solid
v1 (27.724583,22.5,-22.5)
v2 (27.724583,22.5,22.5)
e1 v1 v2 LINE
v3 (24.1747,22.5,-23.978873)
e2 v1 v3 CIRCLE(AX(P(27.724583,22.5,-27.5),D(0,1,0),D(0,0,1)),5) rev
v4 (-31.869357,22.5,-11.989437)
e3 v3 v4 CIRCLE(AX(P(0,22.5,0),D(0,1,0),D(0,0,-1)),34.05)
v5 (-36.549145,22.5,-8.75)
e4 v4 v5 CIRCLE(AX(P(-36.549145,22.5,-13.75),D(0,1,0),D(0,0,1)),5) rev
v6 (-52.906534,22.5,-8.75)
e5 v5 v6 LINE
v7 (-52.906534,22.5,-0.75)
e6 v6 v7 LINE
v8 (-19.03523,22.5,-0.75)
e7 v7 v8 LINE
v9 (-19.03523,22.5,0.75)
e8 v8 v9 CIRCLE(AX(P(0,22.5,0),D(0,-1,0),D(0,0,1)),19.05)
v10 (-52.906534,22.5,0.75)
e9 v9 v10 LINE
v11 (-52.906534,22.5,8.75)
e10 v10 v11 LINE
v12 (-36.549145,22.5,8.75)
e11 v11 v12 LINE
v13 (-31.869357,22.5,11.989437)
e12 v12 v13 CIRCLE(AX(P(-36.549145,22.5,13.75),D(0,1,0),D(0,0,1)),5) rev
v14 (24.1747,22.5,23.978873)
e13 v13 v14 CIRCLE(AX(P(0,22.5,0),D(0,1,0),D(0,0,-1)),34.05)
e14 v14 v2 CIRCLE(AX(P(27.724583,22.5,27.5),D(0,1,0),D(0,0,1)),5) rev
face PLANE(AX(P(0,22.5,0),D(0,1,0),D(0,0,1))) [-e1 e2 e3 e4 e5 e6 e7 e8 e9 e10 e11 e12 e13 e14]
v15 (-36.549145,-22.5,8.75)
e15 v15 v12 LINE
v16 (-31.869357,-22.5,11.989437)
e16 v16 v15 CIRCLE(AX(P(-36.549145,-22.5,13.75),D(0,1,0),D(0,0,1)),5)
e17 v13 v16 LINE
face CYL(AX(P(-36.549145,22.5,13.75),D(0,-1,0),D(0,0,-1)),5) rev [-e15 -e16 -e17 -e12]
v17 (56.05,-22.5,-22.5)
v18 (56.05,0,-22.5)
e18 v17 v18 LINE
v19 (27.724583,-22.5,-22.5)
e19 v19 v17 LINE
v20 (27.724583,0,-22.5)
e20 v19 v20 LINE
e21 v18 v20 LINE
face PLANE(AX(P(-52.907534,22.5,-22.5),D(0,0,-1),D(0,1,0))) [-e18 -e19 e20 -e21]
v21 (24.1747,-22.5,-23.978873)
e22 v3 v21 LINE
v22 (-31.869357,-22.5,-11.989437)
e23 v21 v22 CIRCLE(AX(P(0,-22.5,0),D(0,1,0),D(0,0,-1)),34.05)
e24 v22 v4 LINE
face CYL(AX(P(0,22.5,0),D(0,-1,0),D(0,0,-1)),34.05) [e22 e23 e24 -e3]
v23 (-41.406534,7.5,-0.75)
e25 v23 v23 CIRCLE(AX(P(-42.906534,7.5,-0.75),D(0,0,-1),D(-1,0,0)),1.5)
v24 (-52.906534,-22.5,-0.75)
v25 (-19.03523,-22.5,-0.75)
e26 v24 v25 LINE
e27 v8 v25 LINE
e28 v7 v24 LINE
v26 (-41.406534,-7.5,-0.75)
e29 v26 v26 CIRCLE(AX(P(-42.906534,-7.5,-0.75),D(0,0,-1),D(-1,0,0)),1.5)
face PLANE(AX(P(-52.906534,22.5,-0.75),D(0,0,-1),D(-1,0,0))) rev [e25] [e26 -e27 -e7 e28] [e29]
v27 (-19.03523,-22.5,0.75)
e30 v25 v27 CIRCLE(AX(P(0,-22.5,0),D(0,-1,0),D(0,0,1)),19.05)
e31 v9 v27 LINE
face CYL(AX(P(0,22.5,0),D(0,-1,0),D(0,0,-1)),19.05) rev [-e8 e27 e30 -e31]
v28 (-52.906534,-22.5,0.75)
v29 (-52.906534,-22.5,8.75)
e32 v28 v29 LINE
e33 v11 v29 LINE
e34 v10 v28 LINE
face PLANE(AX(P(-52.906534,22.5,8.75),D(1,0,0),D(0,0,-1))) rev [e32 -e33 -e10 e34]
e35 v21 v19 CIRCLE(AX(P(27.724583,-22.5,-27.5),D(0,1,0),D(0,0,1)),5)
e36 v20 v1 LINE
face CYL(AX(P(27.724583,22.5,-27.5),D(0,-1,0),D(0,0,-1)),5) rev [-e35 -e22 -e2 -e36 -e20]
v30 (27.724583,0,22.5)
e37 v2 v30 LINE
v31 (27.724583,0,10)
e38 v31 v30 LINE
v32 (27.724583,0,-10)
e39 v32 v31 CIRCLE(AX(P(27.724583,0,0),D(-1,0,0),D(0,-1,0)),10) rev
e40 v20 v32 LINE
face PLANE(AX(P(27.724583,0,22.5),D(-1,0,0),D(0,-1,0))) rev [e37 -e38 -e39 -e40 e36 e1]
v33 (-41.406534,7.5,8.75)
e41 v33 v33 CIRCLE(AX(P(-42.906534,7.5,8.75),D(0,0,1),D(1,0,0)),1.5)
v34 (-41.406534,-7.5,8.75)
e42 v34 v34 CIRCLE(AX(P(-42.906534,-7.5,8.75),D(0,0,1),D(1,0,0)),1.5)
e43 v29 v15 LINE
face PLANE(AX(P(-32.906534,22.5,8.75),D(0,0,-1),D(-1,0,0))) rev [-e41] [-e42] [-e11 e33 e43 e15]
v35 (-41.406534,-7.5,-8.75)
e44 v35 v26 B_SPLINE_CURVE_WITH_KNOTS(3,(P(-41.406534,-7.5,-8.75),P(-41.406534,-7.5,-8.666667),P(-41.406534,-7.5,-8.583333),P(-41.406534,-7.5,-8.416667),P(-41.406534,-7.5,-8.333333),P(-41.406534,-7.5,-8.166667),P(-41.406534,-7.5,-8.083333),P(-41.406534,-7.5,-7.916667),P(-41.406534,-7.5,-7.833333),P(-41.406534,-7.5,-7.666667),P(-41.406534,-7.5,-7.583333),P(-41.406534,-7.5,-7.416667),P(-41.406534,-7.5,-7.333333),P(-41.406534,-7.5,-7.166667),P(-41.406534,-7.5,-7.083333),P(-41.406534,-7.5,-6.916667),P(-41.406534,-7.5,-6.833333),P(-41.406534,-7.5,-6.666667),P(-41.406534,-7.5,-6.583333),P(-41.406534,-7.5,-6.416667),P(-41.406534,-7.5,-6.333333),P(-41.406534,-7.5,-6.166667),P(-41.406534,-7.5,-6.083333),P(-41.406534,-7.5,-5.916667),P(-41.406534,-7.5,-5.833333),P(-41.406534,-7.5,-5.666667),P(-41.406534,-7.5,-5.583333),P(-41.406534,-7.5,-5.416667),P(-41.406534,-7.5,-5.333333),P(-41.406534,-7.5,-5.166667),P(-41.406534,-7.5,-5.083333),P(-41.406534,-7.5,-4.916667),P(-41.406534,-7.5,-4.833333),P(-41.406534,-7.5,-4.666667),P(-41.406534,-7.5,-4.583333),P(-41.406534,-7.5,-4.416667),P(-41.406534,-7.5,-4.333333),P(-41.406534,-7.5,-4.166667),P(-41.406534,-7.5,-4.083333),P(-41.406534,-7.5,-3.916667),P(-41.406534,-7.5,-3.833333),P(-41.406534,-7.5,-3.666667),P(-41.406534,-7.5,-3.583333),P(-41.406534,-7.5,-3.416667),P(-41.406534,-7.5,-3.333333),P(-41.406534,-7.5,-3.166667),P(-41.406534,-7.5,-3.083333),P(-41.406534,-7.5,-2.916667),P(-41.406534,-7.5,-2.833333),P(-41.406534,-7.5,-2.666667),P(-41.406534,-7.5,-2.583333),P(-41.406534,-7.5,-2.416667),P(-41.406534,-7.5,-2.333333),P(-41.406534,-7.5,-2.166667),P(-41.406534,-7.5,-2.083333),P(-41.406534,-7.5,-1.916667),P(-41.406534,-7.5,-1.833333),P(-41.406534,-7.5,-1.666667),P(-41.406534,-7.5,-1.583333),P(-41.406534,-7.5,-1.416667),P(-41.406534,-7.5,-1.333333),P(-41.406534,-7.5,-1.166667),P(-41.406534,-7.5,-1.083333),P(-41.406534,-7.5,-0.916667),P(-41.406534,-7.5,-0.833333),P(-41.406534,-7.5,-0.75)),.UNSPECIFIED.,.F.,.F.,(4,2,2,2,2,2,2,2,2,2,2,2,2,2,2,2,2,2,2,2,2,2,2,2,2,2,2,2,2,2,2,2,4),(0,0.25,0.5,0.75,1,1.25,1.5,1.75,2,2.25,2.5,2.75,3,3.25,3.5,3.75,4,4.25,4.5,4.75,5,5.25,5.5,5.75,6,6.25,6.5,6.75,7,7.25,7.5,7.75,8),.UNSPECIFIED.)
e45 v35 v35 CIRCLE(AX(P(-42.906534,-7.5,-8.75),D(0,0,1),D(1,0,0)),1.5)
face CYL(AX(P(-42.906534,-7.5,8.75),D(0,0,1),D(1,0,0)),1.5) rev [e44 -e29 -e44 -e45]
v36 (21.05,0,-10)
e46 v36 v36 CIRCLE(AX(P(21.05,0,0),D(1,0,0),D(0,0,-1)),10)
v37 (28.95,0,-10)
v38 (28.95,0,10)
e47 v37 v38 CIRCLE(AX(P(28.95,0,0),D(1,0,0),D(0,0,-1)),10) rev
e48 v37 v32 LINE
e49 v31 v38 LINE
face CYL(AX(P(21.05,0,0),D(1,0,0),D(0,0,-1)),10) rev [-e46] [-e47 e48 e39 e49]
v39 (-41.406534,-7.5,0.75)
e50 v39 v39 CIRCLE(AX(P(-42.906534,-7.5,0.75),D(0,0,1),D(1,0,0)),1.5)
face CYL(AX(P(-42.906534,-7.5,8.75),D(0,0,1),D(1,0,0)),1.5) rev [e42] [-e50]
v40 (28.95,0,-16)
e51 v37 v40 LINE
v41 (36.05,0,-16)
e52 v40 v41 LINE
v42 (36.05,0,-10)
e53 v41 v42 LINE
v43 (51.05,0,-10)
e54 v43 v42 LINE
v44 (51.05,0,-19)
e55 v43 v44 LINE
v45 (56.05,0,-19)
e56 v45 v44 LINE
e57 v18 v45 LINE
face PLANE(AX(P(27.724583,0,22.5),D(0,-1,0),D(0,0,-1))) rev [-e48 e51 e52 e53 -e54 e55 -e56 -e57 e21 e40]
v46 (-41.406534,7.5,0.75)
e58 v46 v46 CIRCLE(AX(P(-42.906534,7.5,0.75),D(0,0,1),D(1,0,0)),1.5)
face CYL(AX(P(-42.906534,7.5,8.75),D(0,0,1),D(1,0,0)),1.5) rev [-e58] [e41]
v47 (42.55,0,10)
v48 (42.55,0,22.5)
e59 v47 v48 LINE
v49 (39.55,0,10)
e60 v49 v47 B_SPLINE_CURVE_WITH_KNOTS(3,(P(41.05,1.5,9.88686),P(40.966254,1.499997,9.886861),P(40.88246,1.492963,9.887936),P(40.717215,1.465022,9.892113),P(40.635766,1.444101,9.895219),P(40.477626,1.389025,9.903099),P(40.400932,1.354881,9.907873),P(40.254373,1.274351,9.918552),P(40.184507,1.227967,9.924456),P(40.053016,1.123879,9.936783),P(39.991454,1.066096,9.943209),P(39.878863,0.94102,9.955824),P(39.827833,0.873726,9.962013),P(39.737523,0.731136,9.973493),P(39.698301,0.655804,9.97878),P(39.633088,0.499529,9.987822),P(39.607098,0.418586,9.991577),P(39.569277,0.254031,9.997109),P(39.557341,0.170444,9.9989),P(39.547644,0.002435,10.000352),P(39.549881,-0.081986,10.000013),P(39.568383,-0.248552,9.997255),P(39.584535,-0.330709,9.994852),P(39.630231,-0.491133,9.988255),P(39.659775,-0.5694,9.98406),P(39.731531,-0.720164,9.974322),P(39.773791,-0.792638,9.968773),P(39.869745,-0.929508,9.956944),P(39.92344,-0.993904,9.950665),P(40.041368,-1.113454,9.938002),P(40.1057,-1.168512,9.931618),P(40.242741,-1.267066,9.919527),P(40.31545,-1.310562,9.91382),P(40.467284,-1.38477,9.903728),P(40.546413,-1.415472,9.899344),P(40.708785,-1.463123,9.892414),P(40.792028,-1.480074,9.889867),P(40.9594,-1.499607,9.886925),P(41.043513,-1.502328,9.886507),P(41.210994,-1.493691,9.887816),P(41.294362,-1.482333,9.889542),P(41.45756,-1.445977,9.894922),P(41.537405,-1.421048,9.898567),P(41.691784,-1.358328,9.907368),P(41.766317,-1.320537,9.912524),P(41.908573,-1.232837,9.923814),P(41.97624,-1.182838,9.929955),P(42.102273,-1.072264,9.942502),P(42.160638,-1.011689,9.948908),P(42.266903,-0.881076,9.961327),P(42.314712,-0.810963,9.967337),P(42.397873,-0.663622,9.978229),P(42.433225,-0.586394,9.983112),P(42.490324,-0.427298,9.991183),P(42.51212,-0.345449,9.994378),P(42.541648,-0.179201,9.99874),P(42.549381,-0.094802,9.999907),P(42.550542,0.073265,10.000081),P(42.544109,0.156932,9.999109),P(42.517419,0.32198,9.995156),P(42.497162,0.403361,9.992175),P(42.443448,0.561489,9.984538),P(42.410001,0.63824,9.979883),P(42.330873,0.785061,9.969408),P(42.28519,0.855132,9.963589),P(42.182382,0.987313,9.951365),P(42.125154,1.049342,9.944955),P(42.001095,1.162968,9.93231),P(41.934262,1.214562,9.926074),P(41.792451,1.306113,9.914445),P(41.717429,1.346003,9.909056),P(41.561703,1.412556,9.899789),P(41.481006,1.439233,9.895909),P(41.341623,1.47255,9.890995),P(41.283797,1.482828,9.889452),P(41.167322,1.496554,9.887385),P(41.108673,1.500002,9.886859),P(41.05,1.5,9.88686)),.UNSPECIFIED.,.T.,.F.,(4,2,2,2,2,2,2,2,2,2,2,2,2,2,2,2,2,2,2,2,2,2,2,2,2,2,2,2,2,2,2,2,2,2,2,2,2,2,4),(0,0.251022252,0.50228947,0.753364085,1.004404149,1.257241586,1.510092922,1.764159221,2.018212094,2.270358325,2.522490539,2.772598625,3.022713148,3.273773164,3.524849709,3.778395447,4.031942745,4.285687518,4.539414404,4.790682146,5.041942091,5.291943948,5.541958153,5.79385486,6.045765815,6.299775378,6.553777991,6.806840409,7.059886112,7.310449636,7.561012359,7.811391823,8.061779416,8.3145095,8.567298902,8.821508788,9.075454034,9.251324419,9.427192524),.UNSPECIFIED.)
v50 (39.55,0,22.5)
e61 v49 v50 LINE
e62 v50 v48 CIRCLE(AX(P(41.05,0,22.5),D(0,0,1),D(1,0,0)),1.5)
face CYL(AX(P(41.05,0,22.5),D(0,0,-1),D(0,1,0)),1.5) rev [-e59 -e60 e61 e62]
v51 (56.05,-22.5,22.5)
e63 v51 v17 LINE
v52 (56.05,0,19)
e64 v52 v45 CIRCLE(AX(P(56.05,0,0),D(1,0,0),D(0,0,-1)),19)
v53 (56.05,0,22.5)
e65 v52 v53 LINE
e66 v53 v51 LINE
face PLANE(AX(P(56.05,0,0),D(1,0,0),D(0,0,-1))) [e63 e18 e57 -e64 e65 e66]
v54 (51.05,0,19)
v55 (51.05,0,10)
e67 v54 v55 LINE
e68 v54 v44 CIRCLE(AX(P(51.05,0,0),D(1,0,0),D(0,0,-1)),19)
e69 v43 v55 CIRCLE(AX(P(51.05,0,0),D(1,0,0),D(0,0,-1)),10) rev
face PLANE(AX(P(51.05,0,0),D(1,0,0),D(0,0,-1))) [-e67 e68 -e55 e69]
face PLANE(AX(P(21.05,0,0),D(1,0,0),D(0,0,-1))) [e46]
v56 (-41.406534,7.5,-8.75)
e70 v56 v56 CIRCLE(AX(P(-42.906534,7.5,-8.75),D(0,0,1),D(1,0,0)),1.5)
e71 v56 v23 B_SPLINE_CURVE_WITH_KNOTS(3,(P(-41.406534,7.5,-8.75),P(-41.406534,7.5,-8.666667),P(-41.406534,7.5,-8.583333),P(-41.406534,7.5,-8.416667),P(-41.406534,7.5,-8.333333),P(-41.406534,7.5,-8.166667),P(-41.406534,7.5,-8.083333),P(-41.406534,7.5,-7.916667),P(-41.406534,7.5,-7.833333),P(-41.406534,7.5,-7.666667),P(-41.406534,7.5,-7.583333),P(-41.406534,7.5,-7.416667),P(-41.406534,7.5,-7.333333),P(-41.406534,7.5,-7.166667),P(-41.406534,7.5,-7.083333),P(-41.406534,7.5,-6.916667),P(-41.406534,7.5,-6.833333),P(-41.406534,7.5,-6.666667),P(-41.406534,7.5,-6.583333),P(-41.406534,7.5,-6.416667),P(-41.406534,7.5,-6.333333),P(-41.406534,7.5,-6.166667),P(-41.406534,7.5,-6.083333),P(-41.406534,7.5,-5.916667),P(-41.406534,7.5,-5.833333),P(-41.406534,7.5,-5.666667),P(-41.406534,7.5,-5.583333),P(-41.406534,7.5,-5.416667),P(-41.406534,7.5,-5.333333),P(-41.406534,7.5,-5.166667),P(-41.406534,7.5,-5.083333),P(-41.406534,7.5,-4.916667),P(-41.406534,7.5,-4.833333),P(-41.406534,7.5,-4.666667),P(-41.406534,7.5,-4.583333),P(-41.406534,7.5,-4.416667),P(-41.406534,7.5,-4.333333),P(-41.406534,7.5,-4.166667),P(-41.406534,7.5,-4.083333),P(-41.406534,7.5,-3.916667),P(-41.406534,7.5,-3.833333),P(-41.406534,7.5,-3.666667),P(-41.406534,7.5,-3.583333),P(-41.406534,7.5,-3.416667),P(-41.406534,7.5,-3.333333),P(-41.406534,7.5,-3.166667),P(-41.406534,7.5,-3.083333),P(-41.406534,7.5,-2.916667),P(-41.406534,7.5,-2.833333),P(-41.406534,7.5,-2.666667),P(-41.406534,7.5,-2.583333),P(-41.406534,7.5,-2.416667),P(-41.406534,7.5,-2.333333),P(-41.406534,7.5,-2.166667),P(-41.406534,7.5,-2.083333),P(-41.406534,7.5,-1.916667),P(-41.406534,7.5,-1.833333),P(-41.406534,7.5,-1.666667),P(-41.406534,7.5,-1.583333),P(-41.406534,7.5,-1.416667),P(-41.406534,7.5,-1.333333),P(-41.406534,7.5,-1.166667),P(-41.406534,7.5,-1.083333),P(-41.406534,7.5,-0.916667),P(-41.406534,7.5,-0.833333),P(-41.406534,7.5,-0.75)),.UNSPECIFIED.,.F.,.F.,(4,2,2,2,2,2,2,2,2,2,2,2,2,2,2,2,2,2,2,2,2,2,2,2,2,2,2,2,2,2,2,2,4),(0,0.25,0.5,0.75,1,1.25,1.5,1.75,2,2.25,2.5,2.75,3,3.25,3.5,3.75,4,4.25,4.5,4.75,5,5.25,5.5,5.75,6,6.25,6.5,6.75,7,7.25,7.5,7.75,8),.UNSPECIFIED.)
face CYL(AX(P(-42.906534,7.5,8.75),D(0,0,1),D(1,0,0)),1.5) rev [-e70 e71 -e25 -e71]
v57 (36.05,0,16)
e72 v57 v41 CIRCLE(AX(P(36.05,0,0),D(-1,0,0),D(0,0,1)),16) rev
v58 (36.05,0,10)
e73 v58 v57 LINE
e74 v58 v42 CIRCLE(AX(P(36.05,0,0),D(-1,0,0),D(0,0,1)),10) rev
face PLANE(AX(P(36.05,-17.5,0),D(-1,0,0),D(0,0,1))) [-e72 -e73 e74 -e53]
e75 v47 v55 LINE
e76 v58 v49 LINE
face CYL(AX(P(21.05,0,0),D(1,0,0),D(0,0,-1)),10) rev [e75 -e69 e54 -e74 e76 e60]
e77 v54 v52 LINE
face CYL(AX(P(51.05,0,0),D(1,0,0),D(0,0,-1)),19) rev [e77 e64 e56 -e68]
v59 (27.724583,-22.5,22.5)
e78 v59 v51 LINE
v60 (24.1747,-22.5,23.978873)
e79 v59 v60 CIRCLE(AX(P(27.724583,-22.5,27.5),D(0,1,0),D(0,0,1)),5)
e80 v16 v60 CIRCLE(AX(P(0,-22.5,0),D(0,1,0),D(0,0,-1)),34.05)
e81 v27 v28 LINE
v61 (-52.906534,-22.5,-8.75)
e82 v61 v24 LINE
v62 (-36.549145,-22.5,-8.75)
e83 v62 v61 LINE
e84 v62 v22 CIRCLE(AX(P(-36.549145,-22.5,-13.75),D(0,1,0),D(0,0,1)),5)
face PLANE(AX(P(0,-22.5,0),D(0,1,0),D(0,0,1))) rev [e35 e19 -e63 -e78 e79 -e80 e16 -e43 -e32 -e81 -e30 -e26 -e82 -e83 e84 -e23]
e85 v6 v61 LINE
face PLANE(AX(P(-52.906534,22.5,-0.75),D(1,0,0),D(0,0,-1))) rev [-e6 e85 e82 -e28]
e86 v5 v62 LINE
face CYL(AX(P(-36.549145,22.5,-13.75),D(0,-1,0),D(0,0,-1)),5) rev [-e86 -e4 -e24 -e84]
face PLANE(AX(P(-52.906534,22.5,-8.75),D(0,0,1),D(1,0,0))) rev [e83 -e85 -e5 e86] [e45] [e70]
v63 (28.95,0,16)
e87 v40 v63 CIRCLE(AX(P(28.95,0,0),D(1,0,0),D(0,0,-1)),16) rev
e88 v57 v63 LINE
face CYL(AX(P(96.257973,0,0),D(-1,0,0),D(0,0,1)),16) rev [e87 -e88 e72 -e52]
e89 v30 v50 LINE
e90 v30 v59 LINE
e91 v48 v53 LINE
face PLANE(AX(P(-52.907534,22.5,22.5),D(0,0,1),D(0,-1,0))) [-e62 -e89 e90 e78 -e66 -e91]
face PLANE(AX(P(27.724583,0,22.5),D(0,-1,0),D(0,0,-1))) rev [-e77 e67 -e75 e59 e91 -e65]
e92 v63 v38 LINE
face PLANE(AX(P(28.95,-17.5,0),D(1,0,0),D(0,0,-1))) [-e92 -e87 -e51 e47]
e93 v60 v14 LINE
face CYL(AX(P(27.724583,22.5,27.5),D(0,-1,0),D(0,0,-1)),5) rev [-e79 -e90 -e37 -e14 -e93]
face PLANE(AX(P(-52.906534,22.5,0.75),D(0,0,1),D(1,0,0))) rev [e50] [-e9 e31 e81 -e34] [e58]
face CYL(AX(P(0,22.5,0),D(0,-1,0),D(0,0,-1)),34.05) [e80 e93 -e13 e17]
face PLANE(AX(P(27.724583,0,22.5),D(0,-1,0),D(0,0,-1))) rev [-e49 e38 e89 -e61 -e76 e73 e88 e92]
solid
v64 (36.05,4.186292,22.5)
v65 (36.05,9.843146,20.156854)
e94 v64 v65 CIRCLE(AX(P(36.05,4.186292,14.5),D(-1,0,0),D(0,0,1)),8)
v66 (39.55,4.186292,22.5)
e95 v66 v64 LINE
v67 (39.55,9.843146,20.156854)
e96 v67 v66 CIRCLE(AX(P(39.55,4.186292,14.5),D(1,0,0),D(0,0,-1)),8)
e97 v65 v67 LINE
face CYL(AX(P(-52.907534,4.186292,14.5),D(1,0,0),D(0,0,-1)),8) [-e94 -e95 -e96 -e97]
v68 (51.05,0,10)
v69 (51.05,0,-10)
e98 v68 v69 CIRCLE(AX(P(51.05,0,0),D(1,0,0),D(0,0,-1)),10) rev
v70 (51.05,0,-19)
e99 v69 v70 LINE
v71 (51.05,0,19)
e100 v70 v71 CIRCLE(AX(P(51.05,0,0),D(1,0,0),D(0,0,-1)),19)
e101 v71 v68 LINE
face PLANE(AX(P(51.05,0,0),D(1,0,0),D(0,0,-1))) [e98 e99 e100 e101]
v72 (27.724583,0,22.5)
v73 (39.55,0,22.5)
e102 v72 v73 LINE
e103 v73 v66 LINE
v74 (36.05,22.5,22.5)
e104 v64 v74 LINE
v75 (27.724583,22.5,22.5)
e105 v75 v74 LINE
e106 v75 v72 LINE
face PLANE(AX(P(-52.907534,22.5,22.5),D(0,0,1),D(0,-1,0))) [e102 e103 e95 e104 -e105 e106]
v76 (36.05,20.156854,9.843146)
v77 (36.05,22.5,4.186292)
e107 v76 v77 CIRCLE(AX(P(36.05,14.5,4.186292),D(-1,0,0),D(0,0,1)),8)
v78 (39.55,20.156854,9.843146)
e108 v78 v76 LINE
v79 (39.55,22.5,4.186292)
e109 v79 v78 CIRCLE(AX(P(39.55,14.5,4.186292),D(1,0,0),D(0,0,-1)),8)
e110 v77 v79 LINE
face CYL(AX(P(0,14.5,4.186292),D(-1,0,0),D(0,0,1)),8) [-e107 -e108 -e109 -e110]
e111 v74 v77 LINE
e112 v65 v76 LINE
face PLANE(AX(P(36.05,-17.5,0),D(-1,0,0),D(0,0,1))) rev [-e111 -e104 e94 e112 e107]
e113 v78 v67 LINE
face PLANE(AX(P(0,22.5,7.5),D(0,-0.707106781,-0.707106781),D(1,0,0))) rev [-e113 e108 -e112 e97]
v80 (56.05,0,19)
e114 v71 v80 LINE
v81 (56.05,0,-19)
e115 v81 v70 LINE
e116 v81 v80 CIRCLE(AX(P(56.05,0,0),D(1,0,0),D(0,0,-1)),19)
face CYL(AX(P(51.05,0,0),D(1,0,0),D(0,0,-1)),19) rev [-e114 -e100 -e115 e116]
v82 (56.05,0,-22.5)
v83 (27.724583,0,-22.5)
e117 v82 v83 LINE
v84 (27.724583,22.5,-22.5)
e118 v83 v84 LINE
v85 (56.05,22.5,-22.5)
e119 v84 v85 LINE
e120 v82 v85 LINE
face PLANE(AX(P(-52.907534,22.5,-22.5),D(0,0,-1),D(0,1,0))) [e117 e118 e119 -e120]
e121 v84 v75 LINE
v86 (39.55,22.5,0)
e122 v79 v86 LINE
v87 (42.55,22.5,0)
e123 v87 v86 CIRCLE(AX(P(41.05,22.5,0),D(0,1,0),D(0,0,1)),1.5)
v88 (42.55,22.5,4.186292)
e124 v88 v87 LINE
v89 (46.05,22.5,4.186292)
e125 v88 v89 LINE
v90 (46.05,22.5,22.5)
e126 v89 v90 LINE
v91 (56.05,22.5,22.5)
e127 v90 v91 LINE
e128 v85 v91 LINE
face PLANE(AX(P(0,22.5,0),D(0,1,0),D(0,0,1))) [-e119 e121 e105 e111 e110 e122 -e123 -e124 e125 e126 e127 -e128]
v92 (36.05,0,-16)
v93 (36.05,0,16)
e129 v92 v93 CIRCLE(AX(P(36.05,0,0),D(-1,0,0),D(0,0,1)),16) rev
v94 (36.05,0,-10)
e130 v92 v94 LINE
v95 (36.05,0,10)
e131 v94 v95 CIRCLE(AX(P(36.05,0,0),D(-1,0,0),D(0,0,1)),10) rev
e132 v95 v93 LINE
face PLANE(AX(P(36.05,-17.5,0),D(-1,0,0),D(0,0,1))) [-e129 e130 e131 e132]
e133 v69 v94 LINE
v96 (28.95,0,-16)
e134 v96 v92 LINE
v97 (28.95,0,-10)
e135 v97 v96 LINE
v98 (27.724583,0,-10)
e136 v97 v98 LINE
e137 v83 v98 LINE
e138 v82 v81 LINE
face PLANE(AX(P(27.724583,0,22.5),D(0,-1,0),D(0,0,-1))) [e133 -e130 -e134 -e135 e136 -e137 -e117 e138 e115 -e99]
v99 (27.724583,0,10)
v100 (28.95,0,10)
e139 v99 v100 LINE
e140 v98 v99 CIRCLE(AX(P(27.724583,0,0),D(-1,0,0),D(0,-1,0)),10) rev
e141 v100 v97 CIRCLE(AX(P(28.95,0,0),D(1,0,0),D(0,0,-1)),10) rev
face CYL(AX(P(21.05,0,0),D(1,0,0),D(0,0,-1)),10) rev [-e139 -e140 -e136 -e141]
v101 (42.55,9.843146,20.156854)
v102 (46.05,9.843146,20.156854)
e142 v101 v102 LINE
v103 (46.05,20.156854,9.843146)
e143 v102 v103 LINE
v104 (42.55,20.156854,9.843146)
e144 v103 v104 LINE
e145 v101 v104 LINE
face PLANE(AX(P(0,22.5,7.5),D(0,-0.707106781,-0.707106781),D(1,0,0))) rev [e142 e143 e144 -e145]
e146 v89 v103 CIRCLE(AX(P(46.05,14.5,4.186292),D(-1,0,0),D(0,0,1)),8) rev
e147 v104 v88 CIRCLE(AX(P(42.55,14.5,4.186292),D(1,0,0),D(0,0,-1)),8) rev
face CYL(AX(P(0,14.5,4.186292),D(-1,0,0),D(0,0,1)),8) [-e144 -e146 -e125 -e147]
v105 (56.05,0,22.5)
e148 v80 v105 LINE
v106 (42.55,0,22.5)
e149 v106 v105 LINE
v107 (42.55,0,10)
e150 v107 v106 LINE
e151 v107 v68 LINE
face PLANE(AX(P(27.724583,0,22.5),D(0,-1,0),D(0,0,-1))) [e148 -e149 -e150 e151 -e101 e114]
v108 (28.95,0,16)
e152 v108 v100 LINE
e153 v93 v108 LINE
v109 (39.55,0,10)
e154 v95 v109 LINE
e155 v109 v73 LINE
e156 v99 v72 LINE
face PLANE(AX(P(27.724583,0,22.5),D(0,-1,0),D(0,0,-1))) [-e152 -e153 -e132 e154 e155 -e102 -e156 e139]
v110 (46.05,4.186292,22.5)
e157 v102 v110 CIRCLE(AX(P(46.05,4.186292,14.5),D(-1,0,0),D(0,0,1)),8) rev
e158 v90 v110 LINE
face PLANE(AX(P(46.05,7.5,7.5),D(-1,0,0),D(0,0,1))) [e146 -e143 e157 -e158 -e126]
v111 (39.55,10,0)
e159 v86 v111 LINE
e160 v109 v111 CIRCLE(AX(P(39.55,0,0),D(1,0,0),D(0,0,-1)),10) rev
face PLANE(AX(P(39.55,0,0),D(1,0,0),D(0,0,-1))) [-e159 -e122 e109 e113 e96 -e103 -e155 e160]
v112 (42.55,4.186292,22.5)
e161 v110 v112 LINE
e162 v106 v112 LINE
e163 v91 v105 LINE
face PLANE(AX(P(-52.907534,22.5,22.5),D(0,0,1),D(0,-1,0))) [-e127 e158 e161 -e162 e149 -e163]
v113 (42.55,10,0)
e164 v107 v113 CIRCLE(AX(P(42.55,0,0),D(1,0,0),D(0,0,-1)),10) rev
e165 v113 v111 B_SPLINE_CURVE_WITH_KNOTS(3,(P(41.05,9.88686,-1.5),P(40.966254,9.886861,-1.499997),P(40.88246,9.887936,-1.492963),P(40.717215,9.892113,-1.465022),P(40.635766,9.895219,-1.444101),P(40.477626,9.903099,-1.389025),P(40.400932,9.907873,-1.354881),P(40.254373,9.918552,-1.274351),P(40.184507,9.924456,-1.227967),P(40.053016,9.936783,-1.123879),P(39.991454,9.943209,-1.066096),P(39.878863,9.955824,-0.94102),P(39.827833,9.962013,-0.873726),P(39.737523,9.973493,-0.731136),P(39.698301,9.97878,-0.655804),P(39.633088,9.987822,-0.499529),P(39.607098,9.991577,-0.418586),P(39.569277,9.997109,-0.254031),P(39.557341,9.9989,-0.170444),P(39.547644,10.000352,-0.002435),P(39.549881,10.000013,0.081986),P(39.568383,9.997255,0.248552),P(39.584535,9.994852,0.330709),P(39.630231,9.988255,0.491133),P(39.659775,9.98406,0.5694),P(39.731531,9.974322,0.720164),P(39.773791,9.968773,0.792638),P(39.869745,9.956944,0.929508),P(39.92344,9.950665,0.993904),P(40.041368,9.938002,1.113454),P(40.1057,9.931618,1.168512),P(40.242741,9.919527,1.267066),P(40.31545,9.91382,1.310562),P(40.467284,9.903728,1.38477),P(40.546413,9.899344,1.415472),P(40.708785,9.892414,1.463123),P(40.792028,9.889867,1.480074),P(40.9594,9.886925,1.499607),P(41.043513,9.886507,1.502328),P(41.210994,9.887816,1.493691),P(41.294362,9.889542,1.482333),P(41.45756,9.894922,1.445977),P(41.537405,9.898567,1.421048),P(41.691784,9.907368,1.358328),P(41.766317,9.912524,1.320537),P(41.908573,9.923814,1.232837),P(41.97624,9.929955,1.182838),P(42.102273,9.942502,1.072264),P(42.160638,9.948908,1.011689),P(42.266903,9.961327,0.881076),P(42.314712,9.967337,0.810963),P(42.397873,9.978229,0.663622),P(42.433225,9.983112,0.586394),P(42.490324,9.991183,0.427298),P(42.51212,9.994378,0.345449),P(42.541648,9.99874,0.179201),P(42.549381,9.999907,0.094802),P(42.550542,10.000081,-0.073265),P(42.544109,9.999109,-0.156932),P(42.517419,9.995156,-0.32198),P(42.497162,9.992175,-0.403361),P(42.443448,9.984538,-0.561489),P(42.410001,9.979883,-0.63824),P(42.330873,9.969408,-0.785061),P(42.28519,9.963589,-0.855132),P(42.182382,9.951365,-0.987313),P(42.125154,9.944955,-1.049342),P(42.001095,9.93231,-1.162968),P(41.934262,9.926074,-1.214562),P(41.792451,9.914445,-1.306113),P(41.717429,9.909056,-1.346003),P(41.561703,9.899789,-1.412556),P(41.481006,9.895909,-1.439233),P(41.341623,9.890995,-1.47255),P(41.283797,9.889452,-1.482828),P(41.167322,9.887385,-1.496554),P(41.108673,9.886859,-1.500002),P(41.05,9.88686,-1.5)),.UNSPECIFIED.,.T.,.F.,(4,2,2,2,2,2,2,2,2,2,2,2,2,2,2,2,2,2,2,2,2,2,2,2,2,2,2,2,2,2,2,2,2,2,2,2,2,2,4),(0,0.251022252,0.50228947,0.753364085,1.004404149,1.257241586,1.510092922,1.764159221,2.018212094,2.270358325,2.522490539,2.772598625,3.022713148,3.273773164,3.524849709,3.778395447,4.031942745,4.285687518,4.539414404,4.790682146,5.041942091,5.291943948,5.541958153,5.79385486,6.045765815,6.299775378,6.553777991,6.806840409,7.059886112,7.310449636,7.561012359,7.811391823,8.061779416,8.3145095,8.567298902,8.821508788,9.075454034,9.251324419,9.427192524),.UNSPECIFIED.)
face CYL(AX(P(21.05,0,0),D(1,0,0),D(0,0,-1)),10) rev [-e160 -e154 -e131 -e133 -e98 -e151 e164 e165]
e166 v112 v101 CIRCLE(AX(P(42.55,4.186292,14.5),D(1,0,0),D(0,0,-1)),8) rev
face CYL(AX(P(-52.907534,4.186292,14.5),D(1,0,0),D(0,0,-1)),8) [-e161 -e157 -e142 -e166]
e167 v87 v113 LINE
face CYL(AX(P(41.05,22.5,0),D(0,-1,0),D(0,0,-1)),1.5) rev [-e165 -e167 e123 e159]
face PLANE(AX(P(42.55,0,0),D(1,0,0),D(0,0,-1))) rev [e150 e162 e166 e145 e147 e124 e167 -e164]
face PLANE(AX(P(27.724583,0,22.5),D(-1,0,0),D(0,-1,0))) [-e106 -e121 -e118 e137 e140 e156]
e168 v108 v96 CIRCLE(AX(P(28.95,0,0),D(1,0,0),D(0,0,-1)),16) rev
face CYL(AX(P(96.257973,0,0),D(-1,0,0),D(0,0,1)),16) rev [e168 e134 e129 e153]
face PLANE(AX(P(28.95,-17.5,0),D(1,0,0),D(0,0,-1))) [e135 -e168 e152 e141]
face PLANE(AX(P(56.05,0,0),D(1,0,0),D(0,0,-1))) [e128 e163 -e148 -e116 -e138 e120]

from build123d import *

# Parameters (mm, degrees)
BOSS_EXTRUDE1_DEPTH     = 22.5
F_3_0MM_DOWEL_HOLE1_D   = 3
BOSS_EXTRUDE2_START     = -8.493151603
BOSS_EXTRUDE2_OUTLINE_W = 45
BOSS_EXTRUDE2_OUTLINE_H = 45
BOSS_EXTRUDE2_DEPTH     = 30.493151603
SKETCH5_R               = 10
CUT_EXTRUDE1_DEPTH      = 35
SKETCH16_R              = 19
CUT_EXTRUDE9_DEPTH      = 5
CUT_EXTRUDE2_START      = 22.5
SKETCH7_W               = 7.1
SKETCH7_H               = 45
CUT_EXTRUDE2_DEPTH      = 40
SKETCH8_W               = 22.5
SKETCH8_H               = 22.5
CUT_EXTRUDE3_DEPTH      = 1.5
CUT_EXTRUDE5_OUTLINE_W  = 1.5
CUT_EXTRUDE5_OUTLINE_H  = 12.613186919
CUT_EXTRUDE8_START      = 9
CUT_EXTRUDE8_DEPTH      = 14
CHAMFER1_START          = 36.05
CHAMFER1_DEPTH          = 10
FILLET3_R               = 5
FILLET4_R               = 8
SKETCH23_W              = 45
SKETCH23_H              = 40
SKETCH23_R              = 16
BOSS_EXTRUDE5_DEPTH     = 7.1
SPLIT1_START            = 27.724582954
SPLIT1_DEPTH            = 23.325417046
SPLIT1_START_2          = 36.05
SPLIT1_2_DEPTH          = 15
SPLIT1_START_3          = 46.05
SPLIT1_3_DEPTH          = 10
SPLIT1_4_DEPTH          = 8.325417046
SPLIT1_5_DEPTH          = 1.225417046
SPLIT1_6_DEPTH          = 22.5
SPLIT1_7_DEPTH          = 22.5


with BuildPart() as part:
    # Sketch3 → Boss-Extrude1 (new, symmetric)
    with BuildSketch(Plane(origin=(0, 0, 0), x_dir=(1, 0, 0), z_dir=(0, 1, 0))):
        with BuildLine():
            Line((-52.906534306, 0.75), (-52.906534306, 8.75))
            Line((-52.906534306, 8.75), (-32.906534306, 8.75))
            ThreePointArc((-32.906534306, 8.75), (34.05, 0), (-32.906534306, -8.75))
            Line((-32.906534306, -8.75), (-52.906534306, -8.75))
            Line((-52.906534306, -8.75), (-52.906534306, -0.75))
            Line((-52.906534306, -0.75), (-19.035230495, -0.75))
            ThreePointArc((-19.035230495, -0.75), (19.05, 0), (-19.035230495, 0.75))
            Line((-19.035230495, 0.75), (-52.906534306, 0.75))
        make_face()
    extrude(amount=BOSS_EXTRUDE1_DEPTH, both=True)

    # Ø3.0mm Dowel Hole1 (through all)
    with Locations(Plane.XY.offset(8.75)):
        with Locations((-42.906534306, 7.5), (-42.906534306, -7.5)):
            Hole(F_3_0MM_DOWEL_HOLE1_D / 2)

    # Boss-Extrude2: read off the stored shape, not the designer's step
    # Boss-Extrude2 outline → Boss-Extrude2 (add)
    with BuildSketch(Plane(origin=(34.05, 0, 0), x_dir=(0, 0, -1), z_dir=(1, 0, 0)).offset(BOSS_EXTRUDE2_START)):
        Rectangle(BOSS_EXTRUDE2_OUTLINE_W, BOSS_EXTRUDE2_OUTLINE_H)
    extrude(amount=BOSS_EXTRUDE2_DEPTH)

    # Sketch5 → Cut-Extrude1 (cut)
    with BuildSketch(Plane(origin=(56.05, 0, 0), x_dir=(0, 0, -1), z_dir=(1, 0, 0))):
        Circle(SKETCH5_R)
    extrude(amount=-CUT_EXTRUDE1_DEPTH, mode=Mode.SUBTRACT)

    # Sketch16 → Cut-Extrude9 (cut)
    with BuildSketch(Plane(origin=(56.05, 0, 0), x_dir=(0, 0, -1), z_dir=(1, 0, 0))):
        Circle(SKETCH16_R)
    extrude(amount=-CUT_EXTRUDE9_DEPTH, mode=Mode.SUBTRACT)

    # Sketch7 → Cut-Extrude2 (cut)
    with BuildSketch(Plane(origin=(0, 0, 0), x_dir=(1, 0, 0), z_dir=(0, 1, 0)).offset(CUT_EXTRUDE2_START)):
        with Locations((32.5, 0)):
            Rectangle(SKETCH7_W, SKETCH7_H)
    extrude(amount=-CUT_EXTRUDE2_DEPTH, mode=Mode.SUBTRACT)

    # Sketch8 → Cut-Extrude3 (cut, symmetric)
    with BuildSketch(Plane.ZY.offset(-41.05)):
        with Locations((11.25, 11.25)):
            Rectangle(SKETCH8_W, SKETCH8_H)
    extrude(amount=CUT_EXTRUDE3_DEPTH, both=True, mode=Mode.SUBTRACT)

    # Cut-Extrude5: read off the stored shape, not the designer's step
    # Cut-Extrude5 outline → Cut-Extrude5 (revolve, cut)
    with BuildSketch(Plane(origin=(41.05, 0, 0), x_dir=(1, 0, 0), z_dir=(0, -1, 0))):
        with Locations((0.75, 16.19340654)):
            Rectangle(CUT_EXTRUDE5_OUTLINE_W, CUT_EXTRUDE5_OUTLINE_H)
    revolve(axis=Axis((41.05, 0, 0), (0, 0, 1)), mode=Mode.SUBTRACT)

    # Cut-Extrude8: read off the stored shape, not the designer's step
    # Cut-Extrude8 outline → Cut-Extrude8 (cut)
    with BuildSketch(Plane(origin=(0, 0, 0), x_dir=(1, 0, 0), z_dir=(0, 1, 0)).offset(CUT_EXTRUDE8_START)):
        with BuildLine():
            ThreePointArc((42.55, 0), (41.05, 1.5), (39.55, 0))
            Line((39.55, 0), (42.55, 0))
        make_face()
    extrude(amount=CUT_EXTRUDE8_DEPTH, mode=Mode.SUBTRACT)

    # Chamfer1: read off the stored shape, not the designer's step
    # Chamfer1 outline → Chamfer1 (cut)
    with BuildSketch(Plane.YZ.offset(CHAMFER1_START)):
        Polygon((22.5, 22.5), (7.5, 22.5), (22.5, 7.5), align=None)
    extrude(amount=CHAMFER1_DEPTH, mode=Mode.SUBTRACT)

    # Fillet3
    fillet3_edges = [part.edges().sort_by_distance(p)[0] for p in [
        (-32.906534306, 0, -8.75),
        (-32.906534306, 0, 8.75),
        (25.556848397, 0, -22.5),
        (25.556848397, 0, 22.5),
    ]]
    fillet(fillet3_edges, radius=FILLET3_R)

    # Fillet4
    fillet4_edges = [part.edges().sort_by_distance(p)[0] for p in [
        (37.8, 22.5, 7.5),
        (44.3, 22.5, 7.5),
        (37.8, 7.5, 22.5),
        (44.3, 7.5, 22.5),
    ]]
    fillet(fillet4_edges, radius=FILLET4_R)

    # Sketch23 → Boss-Extrude5 (add)
    with BuildSketch(Plane(origin=(28.95, 0, 0), x_dir=(0, 0, -1), z_dir=(1, 0, 0))):
        with Locations((0, 2.5)):
            Rectangle(SKETCH23_W, SKETCH23_H)
        with Locations(Location((0, 0, 0), (0, 0, 180))):
            Circle(SKETCH23_R, mode=Mode.SUBTRACT)
    extrude(amount=BOSS_EXTRUDE5_DEPTH)

    # Split1 7 outline → Split1 7 (cut)
    with BuildSketch(Plane(origin=(0, 0, 0), x_dir=(1, 0, 0), z_dir=(0, 1, 0))):
        with BuildLine():
            Line((27.724582954, 22.5), (27.724582954, -22.5))
            Line((27.724582954, -22.5), (39.55, -22.5))
            Line((39.55, -22.5), (39.55, 0))
            ThreePointArc((39.55, 0), (41.05, 1.5), (42.55, 0))
            Line((42.55, 0), (42.55, -22.5))
            Line((42.55, -22.5), (56.05, -22.5))
            Line((56.05, -22.5), (56.05, 22.5))
            Line((56.05, 22.5), (27.724582954, 22.5))
        make_face()
    extrude(amount=SPLIT1_7_DEPTH, mode=Mode.SUBTRACT)


with BuildPart() as body_2:
    # Split1: read off the stored shape, not the designer's step
    # Split1 outline → Split1 (new body)
    with BuildSketch(Plane.YZ.offset(SPLIT1_START)):
        with BuildLine():
            Line((4.186291501, 22.5), (0, 22.5))
            Line((0, 22.5), (0, 16))
            ThreePointArc((0, 16), (16, 0), (0, -16))
            Line((0, -16), (0, -22.5))
            Line((0, -22.5), (22.5, -22.5))
            Line((22.5, -22.5), (22.5, 4.186291501))
            ThreePointArc((22.5, 4.186291501), (21.89103626, 7.24775896), (20.156854249, 9.843145751))
            Line((20.156854249, 9.843145751), (9.843145751, 20.156854249))
            ThreePointArc((9.843145751, 20.156854249), (7.24775896, 21.89103626), (4.186291501, 22.5))
        make_face()
    extrude(amount=SPLIT1_DEPTH)

    # Split1 2 outline → Split1 2 (add)
    with BuildSketch(Plane.YZ.offset(SPLIT1_START_2)):
        with BuildLine():
            ThreePointArc((0, -16), (16, 0), (0, 16))
            Line((0, 16), (0, 10))
            ThreePointArc((0, 10), (10, 0), (0, -10))
            Line((0, -10), (0, -16))
        make_face()
    extrude(amount=SPLIT1_2_DEPTH)

    # Split1 3 outline → Split1 3 (add)
    with BuildSketch(Plane.YZ.offset(SPLIT1_START_3)):
        with BuildLine():
            Line((0, 22.5), (0, 19))
            ThreePointArc((0, 19), (19, 0), (0, -19))
            Line((0, -19), (0, -22.5))
            Line((0, -22.5), (22.5, -22.5))
            Line((22.5, -22.5), (22.5, 22.5))
            Line((22.5, 22.5), (0, 22.5))
        make_face()
    extrude(amount=SPLIT1_3_DEPTH)

    # Split1 4 outline → Split1 4 (add)
    with BuildSketch(Plane.YZ.offset(SPLIT1_START)):
        with BuildLine():
            Line((22.5, 22.5), (4.186291501, 22.5))
            ThreePointArc((4.186291501, 22.5), (7.24775896, 21.89103626), (9.843145751, 20.156854249))
            Line((9.843145751, 20.156854249), (20.156854249, 9.843145751))
            ThreePointArc((20.156854249, 9.843145751), (21.89103626, 7.24775896), (22.5, 4.186291501))
            Line((22.5, 4.186291501), (22.5, 22.5))
        make_face()
    extrude(amount=SPLIT1_4_DEPTH)

    # Split1 5 outline → Split1 5 (add)
    with BuildSketch(Plane.YZ.offset(SPLIT1_START)):
        with BuildLine():
            ThreePointArc((0, -16), (16, 0), (0, 16))
            Line((0, 16), (0, 10))
            ThreePointArc((0, 10), (10, 0), (0, -10))
            Line((0, -10), (0, -16))
        make_face()
    extrude(amount=SPLIT1_5_DEPTH)

    # Split1 6 outline → Split1 6 (cut)
    with BuildSketch(Plane(origin=(0, 0, 0), x_dir=(1, 0, 0), z_dir=(0, 1, 0))):
        with BuildLine():
            Line((39.55, 0), (39.55, -22.5))
            Line((39.55, -22.5), (42.55, -22.5))
            Line((42.55, -22.5), (42.55, 0))
            ThreePointArc((42.55, 0), (41.05, 1.5), (39.55, 0))
        make_face()
    extrude(amount=SPLIT1_6_DEPTH, mode=Mode.SUBTRACT)


solid = Compound([part.part, body_2.part])
